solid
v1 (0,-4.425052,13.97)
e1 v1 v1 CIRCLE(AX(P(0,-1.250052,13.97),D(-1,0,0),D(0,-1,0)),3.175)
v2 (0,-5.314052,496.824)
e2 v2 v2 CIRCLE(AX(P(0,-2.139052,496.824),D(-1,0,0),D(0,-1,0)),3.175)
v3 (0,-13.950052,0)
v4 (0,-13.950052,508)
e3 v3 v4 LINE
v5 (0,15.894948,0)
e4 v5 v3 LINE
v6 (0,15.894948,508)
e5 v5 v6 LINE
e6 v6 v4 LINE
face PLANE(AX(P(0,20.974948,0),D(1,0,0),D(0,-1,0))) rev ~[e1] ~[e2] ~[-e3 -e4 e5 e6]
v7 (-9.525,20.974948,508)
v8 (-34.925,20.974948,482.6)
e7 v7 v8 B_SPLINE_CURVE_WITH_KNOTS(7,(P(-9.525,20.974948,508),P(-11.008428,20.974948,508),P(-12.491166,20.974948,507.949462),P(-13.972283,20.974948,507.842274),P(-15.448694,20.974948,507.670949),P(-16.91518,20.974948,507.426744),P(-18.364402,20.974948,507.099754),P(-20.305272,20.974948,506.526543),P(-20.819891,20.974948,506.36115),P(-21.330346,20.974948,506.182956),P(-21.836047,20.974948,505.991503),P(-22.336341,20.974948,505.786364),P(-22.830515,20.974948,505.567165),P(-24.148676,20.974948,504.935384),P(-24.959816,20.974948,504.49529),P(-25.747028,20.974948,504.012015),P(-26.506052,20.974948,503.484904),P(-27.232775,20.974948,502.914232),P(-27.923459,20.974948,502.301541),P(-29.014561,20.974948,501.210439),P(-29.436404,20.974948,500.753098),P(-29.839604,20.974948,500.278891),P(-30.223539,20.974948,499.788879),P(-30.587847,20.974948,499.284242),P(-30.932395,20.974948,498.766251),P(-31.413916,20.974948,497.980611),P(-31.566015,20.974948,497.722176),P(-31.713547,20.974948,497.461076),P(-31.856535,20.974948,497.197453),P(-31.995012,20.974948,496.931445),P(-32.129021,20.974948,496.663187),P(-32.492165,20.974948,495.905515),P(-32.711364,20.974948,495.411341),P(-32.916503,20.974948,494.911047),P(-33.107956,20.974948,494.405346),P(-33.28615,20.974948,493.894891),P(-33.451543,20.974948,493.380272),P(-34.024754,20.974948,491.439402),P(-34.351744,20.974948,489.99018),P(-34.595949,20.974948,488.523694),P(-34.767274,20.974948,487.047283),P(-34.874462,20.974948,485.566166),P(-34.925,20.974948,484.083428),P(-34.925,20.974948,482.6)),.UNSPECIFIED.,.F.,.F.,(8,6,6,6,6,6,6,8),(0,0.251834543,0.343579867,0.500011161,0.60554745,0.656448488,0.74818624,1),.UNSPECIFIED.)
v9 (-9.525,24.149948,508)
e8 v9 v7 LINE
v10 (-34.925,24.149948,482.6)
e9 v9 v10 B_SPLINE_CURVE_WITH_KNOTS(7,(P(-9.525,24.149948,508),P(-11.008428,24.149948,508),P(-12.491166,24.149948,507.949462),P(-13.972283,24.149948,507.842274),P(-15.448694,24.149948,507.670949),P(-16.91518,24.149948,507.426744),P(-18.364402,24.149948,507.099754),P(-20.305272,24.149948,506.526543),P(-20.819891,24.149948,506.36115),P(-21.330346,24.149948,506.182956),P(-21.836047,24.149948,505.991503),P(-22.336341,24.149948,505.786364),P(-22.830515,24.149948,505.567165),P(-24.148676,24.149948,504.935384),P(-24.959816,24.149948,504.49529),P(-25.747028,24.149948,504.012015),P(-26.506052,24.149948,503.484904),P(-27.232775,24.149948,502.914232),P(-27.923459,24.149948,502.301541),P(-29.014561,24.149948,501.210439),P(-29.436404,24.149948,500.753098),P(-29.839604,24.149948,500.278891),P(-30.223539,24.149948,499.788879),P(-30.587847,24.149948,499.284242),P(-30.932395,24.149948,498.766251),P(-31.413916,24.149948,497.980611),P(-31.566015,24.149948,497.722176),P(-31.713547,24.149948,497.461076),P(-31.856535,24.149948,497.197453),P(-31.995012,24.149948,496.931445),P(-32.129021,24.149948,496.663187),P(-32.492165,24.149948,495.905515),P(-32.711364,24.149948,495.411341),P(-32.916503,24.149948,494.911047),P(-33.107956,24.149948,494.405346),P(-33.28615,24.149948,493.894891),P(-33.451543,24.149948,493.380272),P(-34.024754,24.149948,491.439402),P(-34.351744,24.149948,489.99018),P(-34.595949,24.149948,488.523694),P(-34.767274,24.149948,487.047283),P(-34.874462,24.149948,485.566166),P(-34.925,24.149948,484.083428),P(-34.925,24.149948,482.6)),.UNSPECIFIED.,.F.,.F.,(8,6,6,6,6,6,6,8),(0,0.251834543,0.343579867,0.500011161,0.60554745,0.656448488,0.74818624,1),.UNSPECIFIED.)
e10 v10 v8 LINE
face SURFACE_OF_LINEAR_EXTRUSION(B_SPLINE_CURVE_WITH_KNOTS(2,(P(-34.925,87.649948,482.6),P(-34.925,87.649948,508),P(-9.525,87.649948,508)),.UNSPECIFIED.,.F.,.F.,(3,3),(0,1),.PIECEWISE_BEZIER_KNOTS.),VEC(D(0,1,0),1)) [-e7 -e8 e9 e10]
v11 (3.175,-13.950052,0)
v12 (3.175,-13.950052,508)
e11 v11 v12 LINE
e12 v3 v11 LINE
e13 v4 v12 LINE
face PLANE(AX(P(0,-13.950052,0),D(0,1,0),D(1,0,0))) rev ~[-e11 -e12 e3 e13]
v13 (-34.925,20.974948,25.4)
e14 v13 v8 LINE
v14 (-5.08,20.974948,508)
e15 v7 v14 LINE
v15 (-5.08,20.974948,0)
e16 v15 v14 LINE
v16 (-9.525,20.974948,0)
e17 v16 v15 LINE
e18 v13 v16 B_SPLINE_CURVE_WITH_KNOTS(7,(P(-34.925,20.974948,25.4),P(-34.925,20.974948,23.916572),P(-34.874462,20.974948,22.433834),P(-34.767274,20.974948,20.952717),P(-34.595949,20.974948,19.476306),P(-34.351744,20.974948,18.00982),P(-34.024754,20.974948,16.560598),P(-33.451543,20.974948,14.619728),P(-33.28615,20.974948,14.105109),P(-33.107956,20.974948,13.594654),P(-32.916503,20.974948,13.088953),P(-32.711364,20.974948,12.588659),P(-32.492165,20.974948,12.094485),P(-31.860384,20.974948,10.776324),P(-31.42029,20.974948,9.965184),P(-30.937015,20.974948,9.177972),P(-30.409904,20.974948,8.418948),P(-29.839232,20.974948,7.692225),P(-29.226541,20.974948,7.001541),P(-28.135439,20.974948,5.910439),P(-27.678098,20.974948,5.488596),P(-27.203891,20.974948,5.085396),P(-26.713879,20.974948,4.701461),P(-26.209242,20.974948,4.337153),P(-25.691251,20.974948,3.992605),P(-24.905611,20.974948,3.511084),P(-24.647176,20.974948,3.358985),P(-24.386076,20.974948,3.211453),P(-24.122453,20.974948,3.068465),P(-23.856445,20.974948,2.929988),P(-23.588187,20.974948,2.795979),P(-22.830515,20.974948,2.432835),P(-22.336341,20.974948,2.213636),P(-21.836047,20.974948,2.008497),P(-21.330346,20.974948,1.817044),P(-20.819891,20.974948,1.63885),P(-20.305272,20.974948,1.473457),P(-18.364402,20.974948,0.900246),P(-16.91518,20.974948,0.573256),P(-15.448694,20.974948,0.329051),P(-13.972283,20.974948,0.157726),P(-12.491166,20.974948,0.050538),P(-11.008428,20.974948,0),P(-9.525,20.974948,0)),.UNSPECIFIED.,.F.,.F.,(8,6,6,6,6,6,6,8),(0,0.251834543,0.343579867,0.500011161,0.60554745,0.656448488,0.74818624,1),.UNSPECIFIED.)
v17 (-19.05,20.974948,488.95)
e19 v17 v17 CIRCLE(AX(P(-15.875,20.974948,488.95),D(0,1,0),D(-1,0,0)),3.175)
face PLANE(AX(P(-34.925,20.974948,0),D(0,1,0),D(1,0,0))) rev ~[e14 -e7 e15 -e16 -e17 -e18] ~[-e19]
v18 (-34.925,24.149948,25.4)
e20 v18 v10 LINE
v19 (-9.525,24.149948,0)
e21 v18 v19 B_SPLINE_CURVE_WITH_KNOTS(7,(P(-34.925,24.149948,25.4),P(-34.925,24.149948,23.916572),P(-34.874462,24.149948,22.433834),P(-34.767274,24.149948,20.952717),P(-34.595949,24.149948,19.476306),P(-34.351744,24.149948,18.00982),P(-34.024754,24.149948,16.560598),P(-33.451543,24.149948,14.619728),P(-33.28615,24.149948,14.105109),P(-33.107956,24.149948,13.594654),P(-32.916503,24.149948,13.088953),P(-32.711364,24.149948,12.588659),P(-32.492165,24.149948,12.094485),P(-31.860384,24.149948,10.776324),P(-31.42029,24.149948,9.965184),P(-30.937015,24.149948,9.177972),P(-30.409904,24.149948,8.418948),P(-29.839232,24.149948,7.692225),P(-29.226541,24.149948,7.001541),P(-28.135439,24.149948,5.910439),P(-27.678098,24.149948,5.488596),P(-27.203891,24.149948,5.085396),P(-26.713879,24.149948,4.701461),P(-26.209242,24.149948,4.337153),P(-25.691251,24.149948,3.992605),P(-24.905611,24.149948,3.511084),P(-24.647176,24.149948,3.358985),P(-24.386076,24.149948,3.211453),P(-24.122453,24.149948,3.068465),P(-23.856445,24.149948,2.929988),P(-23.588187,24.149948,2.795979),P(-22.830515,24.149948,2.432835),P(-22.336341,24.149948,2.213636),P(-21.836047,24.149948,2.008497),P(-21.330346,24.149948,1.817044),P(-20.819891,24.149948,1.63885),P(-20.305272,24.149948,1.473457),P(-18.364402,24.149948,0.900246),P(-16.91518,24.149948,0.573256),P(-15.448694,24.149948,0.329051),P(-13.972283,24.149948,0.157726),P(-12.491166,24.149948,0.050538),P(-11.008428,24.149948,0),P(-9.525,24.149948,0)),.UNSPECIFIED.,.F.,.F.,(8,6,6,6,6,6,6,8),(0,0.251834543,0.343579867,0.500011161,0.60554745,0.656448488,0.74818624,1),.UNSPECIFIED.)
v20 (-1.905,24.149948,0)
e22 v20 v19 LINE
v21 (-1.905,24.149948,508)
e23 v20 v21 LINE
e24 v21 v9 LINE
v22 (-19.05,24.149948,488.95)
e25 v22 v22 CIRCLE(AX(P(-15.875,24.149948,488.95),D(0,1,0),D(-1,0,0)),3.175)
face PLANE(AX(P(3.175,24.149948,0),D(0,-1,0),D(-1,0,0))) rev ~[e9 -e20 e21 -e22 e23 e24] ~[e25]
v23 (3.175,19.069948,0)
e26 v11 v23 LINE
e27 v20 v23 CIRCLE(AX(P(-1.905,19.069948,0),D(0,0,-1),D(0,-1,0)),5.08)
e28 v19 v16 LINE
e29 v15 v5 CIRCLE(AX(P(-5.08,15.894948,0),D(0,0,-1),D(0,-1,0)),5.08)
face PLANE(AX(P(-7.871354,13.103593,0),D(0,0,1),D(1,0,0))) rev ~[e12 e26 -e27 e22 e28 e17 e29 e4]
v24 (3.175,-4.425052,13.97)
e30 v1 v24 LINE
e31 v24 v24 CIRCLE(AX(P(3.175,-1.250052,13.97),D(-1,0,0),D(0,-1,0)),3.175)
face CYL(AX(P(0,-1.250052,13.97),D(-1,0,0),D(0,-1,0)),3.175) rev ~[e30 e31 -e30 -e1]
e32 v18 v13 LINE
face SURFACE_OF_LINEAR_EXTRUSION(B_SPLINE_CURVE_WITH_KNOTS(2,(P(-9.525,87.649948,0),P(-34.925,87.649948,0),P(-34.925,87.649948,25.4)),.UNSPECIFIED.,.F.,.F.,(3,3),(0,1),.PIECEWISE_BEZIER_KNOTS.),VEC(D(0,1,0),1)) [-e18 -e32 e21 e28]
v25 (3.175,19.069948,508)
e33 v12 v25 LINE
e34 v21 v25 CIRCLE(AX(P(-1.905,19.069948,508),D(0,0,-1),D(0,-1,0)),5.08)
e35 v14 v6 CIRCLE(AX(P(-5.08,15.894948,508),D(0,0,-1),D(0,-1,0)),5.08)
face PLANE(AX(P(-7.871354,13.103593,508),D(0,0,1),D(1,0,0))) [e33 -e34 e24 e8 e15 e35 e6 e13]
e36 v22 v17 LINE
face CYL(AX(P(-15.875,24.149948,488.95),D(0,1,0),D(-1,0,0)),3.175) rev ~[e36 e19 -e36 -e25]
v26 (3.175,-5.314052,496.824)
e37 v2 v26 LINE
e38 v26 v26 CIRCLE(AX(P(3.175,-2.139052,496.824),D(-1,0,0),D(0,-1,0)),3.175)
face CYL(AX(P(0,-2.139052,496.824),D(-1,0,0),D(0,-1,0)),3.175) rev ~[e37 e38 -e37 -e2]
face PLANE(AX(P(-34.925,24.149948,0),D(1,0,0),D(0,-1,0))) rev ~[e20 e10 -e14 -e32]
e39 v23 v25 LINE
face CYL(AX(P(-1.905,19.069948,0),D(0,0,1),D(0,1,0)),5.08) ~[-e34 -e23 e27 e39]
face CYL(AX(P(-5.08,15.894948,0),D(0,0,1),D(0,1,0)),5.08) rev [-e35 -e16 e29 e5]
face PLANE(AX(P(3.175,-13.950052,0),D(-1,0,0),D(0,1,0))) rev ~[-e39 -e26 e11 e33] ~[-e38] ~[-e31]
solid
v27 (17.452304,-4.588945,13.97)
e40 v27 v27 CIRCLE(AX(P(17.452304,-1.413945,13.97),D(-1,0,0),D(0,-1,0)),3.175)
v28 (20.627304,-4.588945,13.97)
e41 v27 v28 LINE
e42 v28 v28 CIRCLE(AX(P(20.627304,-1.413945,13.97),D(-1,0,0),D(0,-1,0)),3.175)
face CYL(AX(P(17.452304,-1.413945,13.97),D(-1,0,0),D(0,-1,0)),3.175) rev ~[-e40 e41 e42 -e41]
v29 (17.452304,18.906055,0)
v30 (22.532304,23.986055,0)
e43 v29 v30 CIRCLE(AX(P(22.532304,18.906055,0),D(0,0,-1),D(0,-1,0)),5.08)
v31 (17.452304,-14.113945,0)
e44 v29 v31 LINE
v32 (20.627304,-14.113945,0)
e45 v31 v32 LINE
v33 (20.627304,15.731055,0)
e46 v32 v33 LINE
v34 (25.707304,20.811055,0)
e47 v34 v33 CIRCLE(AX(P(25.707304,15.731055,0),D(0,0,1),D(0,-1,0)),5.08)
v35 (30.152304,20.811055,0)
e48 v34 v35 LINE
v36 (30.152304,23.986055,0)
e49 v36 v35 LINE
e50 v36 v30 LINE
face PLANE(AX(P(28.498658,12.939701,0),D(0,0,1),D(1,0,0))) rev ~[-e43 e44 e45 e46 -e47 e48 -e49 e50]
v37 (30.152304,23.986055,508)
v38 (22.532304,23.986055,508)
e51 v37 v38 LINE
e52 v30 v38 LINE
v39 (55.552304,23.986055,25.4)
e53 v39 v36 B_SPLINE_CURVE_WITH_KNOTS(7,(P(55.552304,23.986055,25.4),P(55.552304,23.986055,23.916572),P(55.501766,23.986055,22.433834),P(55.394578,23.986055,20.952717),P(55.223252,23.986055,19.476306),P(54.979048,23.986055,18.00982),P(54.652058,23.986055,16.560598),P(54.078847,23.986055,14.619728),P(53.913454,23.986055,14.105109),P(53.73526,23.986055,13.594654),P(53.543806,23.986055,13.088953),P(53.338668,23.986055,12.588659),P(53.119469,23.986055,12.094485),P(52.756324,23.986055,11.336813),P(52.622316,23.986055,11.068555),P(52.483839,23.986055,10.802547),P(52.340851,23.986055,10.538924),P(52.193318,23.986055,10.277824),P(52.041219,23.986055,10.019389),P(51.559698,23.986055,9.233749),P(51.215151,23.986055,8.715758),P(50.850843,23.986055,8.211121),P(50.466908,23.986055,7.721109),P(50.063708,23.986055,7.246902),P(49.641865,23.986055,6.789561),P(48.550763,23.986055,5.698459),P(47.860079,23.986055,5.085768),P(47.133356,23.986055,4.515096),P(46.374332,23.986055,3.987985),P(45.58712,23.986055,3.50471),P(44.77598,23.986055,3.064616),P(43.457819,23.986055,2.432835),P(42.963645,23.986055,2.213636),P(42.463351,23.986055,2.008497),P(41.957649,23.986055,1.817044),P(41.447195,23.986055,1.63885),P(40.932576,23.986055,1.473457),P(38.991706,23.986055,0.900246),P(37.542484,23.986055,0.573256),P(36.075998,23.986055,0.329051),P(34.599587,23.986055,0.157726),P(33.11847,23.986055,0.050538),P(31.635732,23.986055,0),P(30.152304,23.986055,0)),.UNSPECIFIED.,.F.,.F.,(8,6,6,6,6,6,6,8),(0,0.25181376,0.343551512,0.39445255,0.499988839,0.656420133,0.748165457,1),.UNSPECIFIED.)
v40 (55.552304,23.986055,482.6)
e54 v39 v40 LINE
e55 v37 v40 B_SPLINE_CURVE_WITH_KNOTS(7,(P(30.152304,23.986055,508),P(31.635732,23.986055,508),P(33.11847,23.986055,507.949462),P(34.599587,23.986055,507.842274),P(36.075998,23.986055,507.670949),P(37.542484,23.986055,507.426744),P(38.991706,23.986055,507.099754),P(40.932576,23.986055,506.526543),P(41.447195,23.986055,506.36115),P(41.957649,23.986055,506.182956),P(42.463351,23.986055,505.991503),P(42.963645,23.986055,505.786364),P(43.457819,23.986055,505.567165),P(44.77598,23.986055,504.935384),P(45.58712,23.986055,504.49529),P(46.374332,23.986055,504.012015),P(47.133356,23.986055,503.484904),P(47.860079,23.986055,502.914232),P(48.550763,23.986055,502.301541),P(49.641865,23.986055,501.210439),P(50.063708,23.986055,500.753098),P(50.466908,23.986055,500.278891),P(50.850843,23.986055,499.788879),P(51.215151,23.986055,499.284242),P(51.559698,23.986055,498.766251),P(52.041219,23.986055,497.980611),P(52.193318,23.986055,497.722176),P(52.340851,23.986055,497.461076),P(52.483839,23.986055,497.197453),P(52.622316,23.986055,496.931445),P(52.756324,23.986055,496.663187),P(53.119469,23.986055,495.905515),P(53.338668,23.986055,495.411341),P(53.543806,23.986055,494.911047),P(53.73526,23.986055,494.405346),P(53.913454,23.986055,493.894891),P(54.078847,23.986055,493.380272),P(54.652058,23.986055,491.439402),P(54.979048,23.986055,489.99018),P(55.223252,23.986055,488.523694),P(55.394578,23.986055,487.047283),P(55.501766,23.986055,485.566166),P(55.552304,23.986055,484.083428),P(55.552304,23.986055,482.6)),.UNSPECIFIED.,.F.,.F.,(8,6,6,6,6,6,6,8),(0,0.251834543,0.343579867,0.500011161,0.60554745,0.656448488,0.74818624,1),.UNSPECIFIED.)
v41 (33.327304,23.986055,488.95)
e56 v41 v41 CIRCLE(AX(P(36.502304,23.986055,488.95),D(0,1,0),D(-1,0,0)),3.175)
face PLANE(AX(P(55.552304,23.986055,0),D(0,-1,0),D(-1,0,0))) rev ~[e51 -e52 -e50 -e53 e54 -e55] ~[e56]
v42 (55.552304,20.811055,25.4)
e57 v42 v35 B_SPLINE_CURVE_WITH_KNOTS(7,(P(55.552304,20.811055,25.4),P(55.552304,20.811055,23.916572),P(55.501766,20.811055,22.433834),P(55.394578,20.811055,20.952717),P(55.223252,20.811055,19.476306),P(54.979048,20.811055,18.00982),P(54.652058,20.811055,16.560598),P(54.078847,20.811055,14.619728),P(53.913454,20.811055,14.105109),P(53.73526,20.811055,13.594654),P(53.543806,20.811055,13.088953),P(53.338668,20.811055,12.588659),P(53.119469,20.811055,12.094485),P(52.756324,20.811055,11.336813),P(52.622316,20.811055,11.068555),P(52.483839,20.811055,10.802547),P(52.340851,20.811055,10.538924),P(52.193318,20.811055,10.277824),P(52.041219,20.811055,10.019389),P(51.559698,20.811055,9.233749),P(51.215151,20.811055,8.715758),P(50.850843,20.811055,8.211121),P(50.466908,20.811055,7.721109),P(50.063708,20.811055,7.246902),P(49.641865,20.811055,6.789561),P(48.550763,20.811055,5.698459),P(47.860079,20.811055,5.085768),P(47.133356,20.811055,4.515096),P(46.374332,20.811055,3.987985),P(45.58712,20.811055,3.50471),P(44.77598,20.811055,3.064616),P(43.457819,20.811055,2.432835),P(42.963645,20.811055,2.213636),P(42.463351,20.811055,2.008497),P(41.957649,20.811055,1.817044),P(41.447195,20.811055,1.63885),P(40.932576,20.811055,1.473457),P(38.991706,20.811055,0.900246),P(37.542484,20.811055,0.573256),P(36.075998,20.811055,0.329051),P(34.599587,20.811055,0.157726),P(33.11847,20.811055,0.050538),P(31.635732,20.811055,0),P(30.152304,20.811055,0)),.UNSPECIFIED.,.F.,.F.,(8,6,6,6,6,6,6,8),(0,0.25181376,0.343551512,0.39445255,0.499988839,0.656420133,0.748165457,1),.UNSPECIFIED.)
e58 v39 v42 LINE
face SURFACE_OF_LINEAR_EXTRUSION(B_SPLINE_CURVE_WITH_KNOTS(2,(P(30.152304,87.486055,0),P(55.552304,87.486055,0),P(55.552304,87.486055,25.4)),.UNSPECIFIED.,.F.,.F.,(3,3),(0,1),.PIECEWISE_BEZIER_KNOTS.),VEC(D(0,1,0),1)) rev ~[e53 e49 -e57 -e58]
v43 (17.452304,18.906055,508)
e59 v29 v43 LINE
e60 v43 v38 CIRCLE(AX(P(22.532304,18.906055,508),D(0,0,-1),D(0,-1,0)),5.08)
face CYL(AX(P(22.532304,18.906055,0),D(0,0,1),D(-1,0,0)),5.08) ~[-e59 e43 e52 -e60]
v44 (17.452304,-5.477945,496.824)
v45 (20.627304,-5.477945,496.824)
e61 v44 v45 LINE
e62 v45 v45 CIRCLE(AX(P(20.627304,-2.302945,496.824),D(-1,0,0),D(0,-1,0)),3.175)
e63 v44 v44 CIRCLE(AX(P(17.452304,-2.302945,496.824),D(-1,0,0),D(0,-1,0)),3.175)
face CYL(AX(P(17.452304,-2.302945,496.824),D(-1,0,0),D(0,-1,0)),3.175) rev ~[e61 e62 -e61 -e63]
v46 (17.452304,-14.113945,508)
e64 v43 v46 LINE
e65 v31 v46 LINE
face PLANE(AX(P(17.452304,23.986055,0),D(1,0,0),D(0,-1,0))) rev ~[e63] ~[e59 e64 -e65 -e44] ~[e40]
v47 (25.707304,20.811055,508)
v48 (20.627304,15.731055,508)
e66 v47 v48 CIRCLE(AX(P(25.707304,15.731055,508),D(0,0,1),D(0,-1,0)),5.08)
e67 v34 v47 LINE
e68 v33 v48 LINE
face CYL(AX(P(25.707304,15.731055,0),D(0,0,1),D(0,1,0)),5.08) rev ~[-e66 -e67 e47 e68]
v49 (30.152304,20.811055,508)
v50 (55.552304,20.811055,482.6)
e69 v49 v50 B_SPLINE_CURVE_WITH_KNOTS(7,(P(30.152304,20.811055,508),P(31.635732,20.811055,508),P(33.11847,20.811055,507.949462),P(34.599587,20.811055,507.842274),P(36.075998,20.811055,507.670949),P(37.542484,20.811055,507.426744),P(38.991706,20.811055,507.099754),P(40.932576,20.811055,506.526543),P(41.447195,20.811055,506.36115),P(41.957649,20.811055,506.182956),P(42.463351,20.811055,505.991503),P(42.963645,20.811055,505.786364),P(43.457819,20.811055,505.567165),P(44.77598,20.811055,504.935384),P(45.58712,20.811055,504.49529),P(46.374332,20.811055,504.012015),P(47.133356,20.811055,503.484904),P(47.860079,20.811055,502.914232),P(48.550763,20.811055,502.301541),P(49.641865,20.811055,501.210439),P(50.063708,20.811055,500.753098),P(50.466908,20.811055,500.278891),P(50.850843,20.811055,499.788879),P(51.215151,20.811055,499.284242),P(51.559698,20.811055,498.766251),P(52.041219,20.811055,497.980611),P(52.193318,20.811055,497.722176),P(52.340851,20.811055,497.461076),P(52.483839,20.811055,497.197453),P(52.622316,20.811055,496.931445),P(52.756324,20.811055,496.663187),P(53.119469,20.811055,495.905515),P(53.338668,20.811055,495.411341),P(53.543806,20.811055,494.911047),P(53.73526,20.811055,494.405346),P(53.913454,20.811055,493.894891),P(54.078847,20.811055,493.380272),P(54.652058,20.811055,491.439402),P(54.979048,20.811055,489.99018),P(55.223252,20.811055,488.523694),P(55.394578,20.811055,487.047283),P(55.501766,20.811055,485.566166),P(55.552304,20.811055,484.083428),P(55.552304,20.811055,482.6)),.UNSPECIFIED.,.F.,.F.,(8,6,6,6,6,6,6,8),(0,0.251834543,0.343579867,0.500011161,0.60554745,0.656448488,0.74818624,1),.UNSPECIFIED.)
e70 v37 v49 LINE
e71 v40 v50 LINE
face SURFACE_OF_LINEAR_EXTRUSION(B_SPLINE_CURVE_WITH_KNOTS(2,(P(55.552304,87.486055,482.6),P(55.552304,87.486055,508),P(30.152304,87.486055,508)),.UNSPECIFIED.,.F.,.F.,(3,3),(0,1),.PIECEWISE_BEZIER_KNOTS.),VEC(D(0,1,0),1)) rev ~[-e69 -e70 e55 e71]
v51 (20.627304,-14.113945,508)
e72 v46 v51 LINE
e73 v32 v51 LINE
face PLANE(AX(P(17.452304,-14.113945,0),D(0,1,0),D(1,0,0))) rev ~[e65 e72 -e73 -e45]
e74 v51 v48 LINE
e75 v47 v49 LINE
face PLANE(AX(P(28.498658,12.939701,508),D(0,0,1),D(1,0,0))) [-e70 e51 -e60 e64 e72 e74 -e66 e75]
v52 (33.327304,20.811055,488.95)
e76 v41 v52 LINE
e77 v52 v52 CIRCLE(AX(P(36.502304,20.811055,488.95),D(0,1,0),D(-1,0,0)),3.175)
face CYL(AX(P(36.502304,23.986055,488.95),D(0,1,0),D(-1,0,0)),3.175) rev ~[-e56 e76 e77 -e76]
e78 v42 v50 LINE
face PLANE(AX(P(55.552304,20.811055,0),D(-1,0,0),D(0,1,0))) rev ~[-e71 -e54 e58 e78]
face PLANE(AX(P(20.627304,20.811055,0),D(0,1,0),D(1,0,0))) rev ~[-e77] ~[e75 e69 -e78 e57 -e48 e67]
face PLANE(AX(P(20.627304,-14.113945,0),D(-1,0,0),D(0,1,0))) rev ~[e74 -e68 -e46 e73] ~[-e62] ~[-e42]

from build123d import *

# Parameters (mm, degrees)
F1_DEPTH       = 508
F2_R           = 3.175
F3_DEPTH       = 3.175
F4_R           = 3.175
F5_DEPTH       = 3.175
F7_DEPTH       = 508
F8_R           = 3.175
F9_DEPTH       = 3.175
F10_R          = 3.175
F11_DEPTH      = 3.175
F12_R          = 3.175
F13_DEPTH      = 3.175
F14_T1_DEPTH   = 130.175
F16_T1_DEPTH   = 130.175
F15_R          = 3.175
F17_DEPTH      = 3.175
F18_T1_DEPTH   = 130.175
F18_2_T1_DEPTH = 130.175
F19_R          = 5.08
F19_2_R        = 5.08


# Not quite as in the source:
# - a fillet or chamfer that OpenCascade refuses, or shapes differently, is made with other operations: its cross-section is extruded or revolved along the edge and cut away or added


with BuildPart() as f1:
    # F0 (on Top) → F1 (new body)
    with BuildSketch(Plane.XY):
        Polygon((-34.925, 24.1499475421), (-34.925, 20.9749475421), (0, 20.9749475421), (0, -13.9500524579), (3.175, -13.9500524579), (3.175, 24.1499475421), align=None)
    extrude(amount=F1_DEPTH)

    # F2 (on face) → F3 (cut)
    with BuildSketch(Plane(origin=(0, 0, 0), x_dir=(0, -1, 0), z_dir=(-1, 0, 0))):
        with Locations((2.1390524579, 496.824)):
            Circle(F2_R)
    extrude(amount=-F3_DEPTH, mode=Mode.SUBTRACT)

    # F4 (on face) → F5 (cut)
    with BuildSketch(Plane(origin=(0, 0, 0), x_dir=(0, -1, 0), z_dir=(-1, 0, 0))):
        with Locations((1.2500524579, 13.97)):
            Circle(F4_R)
    extrude(amount=-F5_DEPTH, mode=Mode.SUBTRACT)

    # F16: fillet of radius 25.4 on 1 edges, made by hand

    # F16_s2 → F16_t1 (cut)
    with BuildSketch(Plane.XZ.offset(-87.6499475421)):
        with BuildLine():
            add(Edge.make_bspline(
                [(-34.925, 482.6), (-34.925, 508), (-9.525, 508)],
                knots=[0, 0, 0, 1, 1, 1], degree=2, weights=[1, 1, 1]))
            Line((-9.525, 508), (-34.925, 508))
            Line((-34.925, 508), (-34.925, 482.6))
        make_face()
    extrude(amount=F16_T1_DEPTH, mode=Mode.SUBTRACT)

    # F15 (on face) → F17 (cut)
    with BuildSketch(Plane(origin=(0, 24.1499475421, 0), x_dir=(-1, 0, 0), z_dir=(0, 1, 0))):
        with Locations((15.875, 488.95)):
            Circle(F15_R)
    extrude(amount=-F17_DEPTH, mode=Mode.SUBTRACT)

    # F18#2: fillet of radius 25.4 on 1 edges, made by hand

    # F18_2_s2 → F18_2_t1 (cut)
    with BuildSketch(Plane.XZ.offset(-87.6499475421)):
        with BuildLine():
            add(Edge.make_bspline(
                [(-9.525, 0), (-34.925, 0), (-34.925, 25.4)],
                knots=[0, 0, 0, 1, 1, 1], degree=2, weights=[1, 1, 1]))
            Line((-34.925, 25.4), (-34.925, 0))
            Line((-34.925, 0), (-9.525, 0))
        make_face()
    extrude(amount=F18_2_T1_DEPTH, mode=Mode.SUBTRACT)

    # F19#2
    f19_2_edges = [f1.edges().sort_by_distance(p)[0] for p in [
        (0, 20.974948, 254),
        (3.175, 24.149948, 254),
    ]]
    fillet(f19_2_edges, radius=F19_2_R)


with BuildPart() as f7:
    # F6 (on Top) → F7 (new body)
    with BuildSketch(Plane.XY):
        Polygon((17.4523038154, 23.9860548146), (17.4523038154, -14.1139451854), (20.6273038154, -14.1139451854), (20.6273038154, 20.8110548146), (55.5523038154, 20.8110548146), (55.5523038154, 23.9860548146), align=None)
    extrude(amount=F7_DEPTH)

    # F8 (on face) → F9 (cut)
    with BuildSketch(Plane(origin=(17.4523038154, 0, 0), x_dir=(0, -1, 0), z_dir=(-1, 0, 0))):
        with Locations((2.3029451854, 496.824)):
            Circle(F8_R)
    extrude(amount=-F9_DEPTH, mode=Mode.SUBTRACT)

    # F10 (on face) → F11 (cut)
    with BuildSketch(Plane(origin=(17.4523038154, 0, 0), x_dir=(0, -1, 0), z_dir=(-1, 0, 0))):
        with Locations((1.4139451854, 13.97)):
            Circle(F10_R)
    extrude(amount=-F11_DEPTH, mode=Mode.SUBTRACT)

    # F12 (on face) → F13 (cut)
    with BuildSketch(Plane(origin=(0, 23.9860548146, 0), x_dir=(-1, 0, 0), z_dir=(0, 1, 0))):
        with Locations((-36.5023038154, 488.95)):
            Circle(F12_R)
    extrude(amount=-F13_DEPTH, mode=Mode.SUBTRACT)

    # F14: fillet of radius 25.4 on 1 edges, made by hand

    # F14_s2 → F14_t1 (cut)
    with BuildSketch(Plane.XZ.offset(-87.4860548146)):
        with BuildLine():
            add(Edge.make_bspline(
                [(55.5523038154, 482.6), (55.5523038154, 508), (30.1523038154, 508)],
                knots=[0, 0, 0, 1, 1, 1], degree=2, weights=[1, 1, 1]))
            Line((30.1523038154, 508), (55.5523038154, 508))
            Line((55.5523038154, 508), (55.5523038154, 482.6))
        make_face()
    extrude(amount=F14_T1_DEPTH, mode=Mode.SUBTRACT)

    # F18: fillet of radius 25.4 on 1 edges, made by hand

    # F18_s2 → F18_t1 (cut)
    with BuildSketch(Plane.XZ.offset(-87.4860548146)):
        with BuildLine():
            add(Edge.make_bspline(
                [(30.1523038154, 0), (55.5523038154, 0), (55.5523038154, 25.4)],
                knots=[0, 0, 0, 1, 1, 1], degree=2, weights=[1, 1, 1]))
            Line((55.5523038154, 25.4), (55.5523038154, 0))
            Line((55.5523038154, 0), (30.1523038154, 0))
        make_face()
    extrude(amount=F18_T1_DEPTH, mode=Mode.SUBTRACT)

    # F19
    f19_edges = [f7.edges().sort_by_distance(p)[0] for p in [
        (20.627304, 20.811055, 254),
        (17.452304, 23.986055, 254),
    ]]
    fillet(f19_edges, radius=F19_R)


solid = Compound([f1.part, f7.part])
